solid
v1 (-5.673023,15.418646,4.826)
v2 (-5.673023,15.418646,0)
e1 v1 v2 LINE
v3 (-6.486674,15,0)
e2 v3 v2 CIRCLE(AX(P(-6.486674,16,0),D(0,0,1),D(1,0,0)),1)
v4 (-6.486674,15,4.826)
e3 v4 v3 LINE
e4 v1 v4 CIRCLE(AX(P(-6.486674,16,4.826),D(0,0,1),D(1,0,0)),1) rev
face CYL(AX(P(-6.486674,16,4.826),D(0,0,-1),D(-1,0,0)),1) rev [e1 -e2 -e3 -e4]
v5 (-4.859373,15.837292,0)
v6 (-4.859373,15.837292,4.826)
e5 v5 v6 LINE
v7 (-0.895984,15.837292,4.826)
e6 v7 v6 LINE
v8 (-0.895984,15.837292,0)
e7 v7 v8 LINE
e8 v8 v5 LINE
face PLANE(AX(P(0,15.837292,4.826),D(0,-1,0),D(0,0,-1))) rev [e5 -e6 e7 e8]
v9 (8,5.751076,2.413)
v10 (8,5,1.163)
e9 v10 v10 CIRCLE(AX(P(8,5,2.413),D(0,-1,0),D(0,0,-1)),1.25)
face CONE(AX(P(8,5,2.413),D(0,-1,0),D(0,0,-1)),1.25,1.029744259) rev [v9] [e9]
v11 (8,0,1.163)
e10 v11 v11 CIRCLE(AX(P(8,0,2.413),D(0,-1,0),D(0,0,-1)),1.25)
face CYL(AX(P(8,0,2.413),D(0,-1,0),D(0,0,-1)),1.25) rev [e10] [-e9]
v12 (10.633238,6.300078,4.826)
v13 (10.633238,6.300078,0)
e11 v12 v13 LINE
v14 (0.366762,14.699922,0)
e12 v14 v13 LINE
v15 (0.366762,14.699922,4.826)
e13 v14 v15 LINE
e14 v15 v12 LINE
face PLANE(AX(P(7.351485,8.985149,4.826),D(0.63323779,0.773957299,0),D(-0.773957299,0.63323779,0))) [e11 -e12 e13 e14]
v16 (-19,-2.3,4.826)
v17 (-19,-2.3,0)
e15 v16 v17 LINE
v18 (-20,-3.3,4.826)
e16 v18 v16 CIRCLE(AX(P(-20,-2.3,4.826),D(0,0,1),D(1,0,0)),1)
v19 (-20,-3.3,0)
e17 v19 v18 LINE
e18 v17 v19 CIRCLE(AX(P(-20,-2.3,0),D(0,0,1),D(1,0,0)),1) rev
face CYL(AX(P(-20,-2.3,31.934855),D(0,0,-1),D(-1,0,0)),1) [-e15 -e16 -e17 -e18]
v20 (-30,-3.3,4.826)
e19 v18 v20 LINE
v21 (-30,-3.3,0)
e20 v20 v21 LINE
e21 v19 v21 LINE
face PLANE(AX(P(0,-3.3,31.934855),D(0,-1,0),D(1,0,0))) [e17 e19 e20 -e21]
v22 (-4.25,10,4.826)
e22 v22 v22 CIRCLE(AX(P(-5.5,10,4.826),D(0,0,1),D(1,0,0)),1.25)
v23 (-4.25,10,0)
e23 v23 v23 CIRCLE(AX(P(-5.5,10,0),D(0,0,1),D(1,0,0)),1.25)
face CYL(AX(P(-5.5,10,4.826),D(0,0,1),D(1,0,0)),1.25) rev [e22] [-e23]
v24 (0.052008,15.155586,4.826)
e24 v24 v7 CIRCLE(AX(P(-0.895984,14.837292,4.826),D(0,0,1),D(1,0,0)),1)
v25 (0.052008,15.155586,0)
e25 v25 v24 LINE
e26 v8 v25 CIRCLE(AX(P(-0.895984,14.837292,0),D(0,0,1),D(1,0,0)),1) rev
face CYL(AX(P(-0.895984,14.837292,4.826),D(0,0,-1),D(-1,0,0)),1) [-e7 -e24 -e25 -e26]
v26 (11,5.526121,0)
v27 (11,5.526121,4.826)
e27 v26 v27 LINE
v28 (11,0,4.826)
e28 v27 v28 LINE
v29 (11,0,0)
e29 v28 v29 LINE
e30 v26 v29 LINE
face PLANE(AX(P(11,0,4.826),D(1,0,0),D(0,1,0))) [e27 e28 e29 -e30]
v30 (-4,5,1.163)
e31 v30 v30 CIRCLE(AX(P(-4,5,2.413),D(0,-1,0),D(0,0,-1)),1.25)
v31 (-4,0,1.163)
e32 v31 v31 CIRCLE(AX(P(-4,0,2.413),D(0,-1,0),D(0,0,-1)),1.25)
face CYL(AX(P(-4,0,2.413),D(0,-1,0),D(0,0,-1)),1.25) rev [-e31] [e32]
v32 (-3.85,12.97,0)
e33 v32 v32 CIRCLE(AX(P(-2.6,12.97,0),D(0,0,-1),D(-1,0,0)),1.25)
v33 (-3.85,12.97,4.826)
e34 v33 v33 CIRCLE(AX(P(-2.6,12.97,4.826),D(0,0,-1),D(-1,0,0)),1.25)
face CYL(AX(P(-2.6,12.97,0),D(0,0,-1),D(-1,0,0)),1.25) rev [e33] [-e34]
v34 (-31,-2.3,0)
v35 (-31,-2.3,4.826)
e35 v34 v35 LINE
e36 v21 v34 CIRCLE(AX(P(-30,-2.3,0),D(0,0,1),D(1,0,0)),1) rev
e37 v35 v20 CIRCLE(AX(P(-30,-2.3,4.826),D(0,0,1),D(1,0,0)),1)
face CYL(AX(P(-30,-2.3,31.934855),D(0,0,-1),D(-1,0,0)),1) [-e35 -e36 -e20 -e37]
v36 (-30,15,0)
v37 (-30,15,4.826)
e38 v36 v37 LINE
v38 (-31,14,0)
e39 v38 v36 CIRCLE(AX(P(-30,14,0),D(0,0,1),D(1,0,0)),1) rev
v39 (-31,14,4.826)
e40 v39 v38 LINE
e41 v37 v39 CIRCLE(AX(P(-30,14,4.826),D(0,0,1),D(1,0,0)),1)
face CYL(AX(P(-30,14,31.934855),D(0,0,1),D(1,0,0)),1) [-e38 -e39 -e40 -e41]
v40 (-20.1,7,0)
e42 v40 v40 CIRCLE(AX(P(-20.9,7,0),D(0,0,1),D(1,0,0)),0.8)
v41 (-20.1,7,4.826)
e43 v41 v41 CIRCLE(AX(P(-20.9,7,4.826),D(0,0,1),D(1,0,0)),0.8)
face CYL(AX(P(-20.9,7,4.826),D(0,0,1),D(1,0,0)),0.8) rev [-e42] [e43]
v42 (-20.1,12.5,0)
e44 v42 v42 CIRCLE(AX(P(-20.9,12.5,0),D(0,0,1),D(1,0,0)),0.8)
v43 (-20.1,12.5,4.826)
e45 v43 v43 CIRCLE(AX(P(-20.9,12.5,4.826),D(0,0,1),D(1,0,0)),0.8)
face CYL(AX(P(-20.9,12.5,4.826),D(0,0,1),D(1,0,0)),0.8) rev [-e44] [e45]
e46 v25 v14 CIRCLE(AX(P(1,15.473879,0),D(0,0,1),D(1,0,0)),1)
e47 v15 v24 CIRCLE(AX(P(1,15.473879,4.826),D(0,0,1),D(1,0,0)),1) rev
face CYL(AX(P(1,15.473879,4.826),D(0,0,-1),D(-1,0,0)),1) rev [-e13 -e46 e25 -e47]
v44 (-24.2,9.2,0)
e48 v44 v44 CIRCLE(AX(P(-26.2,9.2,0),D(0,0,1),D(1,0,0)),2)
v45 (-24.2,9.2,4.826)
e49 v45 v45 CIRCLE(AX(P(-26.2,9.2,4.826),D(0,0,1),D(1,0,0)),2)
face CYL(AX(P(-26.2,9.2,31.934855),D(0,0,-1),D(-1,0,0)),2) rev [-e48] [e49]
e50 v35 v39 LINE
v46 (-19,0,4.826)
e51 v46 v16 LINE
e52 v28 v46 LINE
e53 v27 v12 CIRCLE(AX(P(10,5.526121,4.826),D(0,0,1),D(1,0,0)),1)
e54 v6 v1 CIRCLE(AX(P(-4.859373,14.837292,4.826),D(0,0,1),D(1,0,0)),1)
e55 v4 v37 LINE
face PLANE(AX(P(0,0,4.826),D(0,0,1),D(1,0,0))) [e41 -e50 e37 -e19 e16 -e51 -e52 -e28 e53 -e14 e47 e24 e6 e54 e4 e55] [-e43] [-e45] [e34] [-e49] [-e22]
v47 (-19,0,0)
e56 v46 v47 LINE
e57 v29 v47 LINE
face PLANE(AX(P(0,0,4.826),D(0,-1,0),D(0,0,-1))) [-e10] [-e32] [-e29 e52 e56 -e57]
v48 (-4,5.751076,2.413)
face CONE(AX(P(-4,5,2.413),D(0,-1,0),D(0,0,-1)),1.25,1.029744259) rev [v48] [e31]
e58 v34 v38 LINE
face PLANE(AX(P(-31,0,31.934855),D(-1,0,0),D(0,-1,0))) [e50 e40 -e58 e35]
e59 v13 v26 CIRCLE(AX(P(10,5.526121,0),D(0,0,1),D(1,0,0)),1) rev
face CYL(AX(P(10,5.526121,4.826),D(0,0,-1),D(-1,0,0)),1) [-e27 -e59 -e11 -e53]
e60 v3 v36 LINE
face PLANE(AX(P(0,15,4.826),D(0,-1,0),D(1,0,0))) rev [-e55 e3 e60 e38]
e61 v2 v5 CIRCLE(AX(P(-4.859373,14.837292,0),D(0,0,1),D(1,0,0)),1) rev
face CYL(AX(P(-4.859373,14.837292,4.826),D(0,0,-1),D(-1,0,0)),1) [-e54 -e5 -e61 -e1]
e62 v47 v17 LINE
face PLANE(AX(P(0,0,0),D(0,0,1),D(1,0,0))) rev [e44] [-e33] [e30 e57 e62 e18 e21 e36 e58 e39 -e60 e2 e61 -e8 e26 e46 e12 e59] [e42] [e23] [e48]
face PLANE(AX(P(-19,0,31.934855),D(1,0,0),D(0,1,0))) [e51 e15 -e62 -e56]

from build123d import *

# Parameters (mm, degrees)
BOSS_EXTRUDE1_DEPTH             = 4.826
M3X0_5_TAPPED_HOLE1_D           = 2.5
TAP_DRILL_FOR_M3X0_5_TAP1_D     = 2.5
TAP_DRILL_FOR_M3X0_5_TAP1_DEPTH = 5
TAP_DRILL_FOR_M3X0_5_TAP1_TIP   = 0.751075774
M3X0_5_TAPPED_HOLE2_D           = 2.5
SKETCH1_3_R                     = 2
BOSS_EXTRUDE2_DEPTH             = 4.826
FILLET1_R                       = 1
M1_TAPPED_HOLES_D               = 1.6
FILLET2_R                       = 1


with BuildPart() as part:
    # Sketch1 → Boss-Extrude1 (new body)
    with BuildSketch(Plane.XY):
        Polygon((-11, 0), (0, 0), (11, 0), (11, 6), (0, 15), (0, 15.837292271), (-5.5, 15.837292271), (-5.5, 15), (-11, 15), align=None)
    extrude(amount=BOSS_EXTRUDE1_DEPTH)

    # M3x0.5 Tapped Hole1 (through all)
    with Locations(Plane.XY.offset(4.826)):
        with Locations((-5.5, 10)):
            Hole(M3X0_5_TAPPED_HOLE1_D / 2)

    # Tap Drill for M3x0.5 Tap1
    with Locations(Plane(origin=(-4, 0, 2.413), x_dir=(0, 0, -1), z_dir=(0, -1, 0))):
        with Locations((0, 0), (0, 12)):
            Hole(TAP_DRILL_FOR_M3X0_5_TAP1_D / 2, depth=TAP_DRILL_FOR_M3X0_5_TAP1_DEPTH)
            with Locations((0, 0, -(TAP_DRILL_FOR_M3X0_5_TAP1_DEPTH + TAP_DRILL_FOR_M3X0_5_TAP1_TIP / 2))):  # 118° drill point
                Cone(0, TAP_DRILL_FOR_M3X0_5_TAP1_D / 2, TAP_DRILL_FOR_M3X0_5_TAP1_TIP, mode=Mode.SUBTRACT)

    # M3x0.5 Tapped Hole2 (through all)
    with Locations(Plane(origin=(-2.6, 12.97, 0), x_dir=(-1, 0, 0), z_dir=(0, 0, -1))):
        with Locations((0, 0)):
            Hole(M3X0_5_TAPPED_HOLE2_D / 2)

    # Sketch1<3> → Boss-Extrude2 (add)
    with BuildSketch(Plane.XY):
        Polygon((-19, 0), (-11, 0), (-11, 15), (-19, 15), (-31, 15), (-31, -3.3), (-19, -3.3), align=None)
        with Locations((-26.2, 9.2)):
            Circle(SKETCH1_3_R, mode=Mode.SUBTRACT)
    extrude(amount=BOSS_EXTRUDE2_DEPTH)

    # Fillet1
    # the kernel refuses this fillet: 1 mm, written as the material it adds along each edge
    with BuildSketch(Plane(origin=(-5.5, 15, 0), x_dir=(-1, 0, 0), z_dir=(0, 0, 1))) as fillet1_piece_1:
        with BuildLine():
            CenterArc((0.98667431, -1), FILLET1_R, 90, 80.635902393)
            Line((0, -0.837292271), (0, 0))
            Line((0, 0), (0.98667431, 0))
        make_face()
    extrude(amount=4.826)
    with BuildSketch(Plane(origin=(0, 15, 0), x_dir=(0, 1, 0), z_dir=(0, 0, 1))) as fillet1_piece_2:
        with BuildLine():
            CenterArc((FILLET1_R * 0.473879127596, -FILLET1_R), FILLET1_R, 90, 50.710593137)
            Line((-FILLET1_R * 0.300078171608, -FILLET1_R * 0.366762209743), (0, 0))
            Line((0, 0), (FILLET1_R * 0.473879127596, 0))
        make_face()
    extrude(amount=4.826)
    # the kernel refuses this fillet: 1 mm, written as the material it takes off along each edge
    with BuildSketch(Plane(origin=(-31, 15, -2.5), x_dir=(1, 0, 0), z_dir=(0, 0, 1)), Plane(origin=(-19, -3.3, -2.5), x_dir=(-1, 0, 0), z_dir=(0, 0, 1)), Plane(origin=(-31, -3.3, -2.5), x_dir=(0, 1, 0), z_dir=(0, 0, 1))) as fillet1_2_piece_1:
        with BuildLine():
            CenterArc((FILLET1_R, -FILLET1_R), FILLET1_R, 90, 90)
            Line((0, -FILLET1_R), (0, 0))
            Line((0, 0), (FILLET1_R, 0))
        make_face()
    extrude(amount=9.826, mode=Mode.SUBTRACT)
    with BuildSketch(Plane(origin=(11, 6, -1.184697819), x_dir=(0, -1, 0), z_dir=(0, 0, 1))) as fillet1_2_piece_2:
        with BuildLine():
            CenterArc((FILLET1_R * 0.473879127596, -FILLET1_R), FILLET1_R, 90, 50.710593137)
            Line((-FILLET1_R * 0.300078171608, -FILLET1_R * 0.366762209743), (0, 0))
            Line((0, 0), (FILLET1_R * 0.473879127596, 0))
        make_face()
    extrude(amount=7.195395638, mode=Mode.SUBTRACT)

    # M1 Tapped Holes (through all)
    with Locations(Plane.XY.offset(4.826)):
        with Locations((-20.9, 12.5), (-20.9, 7)):
            Hole(M1_TAPPED_HOLES_D / 2)

    # Fillet2
    fillet2_edges = [part.edges().sort_by_distance(p)[0] for p in [
        (0, 15.837292271, 2.413),
        (-5.5, 15.837292271, 2.413),
    ]]
    fillet(fillet2_edges, radius=FILLET2_R)


solid = part.part
